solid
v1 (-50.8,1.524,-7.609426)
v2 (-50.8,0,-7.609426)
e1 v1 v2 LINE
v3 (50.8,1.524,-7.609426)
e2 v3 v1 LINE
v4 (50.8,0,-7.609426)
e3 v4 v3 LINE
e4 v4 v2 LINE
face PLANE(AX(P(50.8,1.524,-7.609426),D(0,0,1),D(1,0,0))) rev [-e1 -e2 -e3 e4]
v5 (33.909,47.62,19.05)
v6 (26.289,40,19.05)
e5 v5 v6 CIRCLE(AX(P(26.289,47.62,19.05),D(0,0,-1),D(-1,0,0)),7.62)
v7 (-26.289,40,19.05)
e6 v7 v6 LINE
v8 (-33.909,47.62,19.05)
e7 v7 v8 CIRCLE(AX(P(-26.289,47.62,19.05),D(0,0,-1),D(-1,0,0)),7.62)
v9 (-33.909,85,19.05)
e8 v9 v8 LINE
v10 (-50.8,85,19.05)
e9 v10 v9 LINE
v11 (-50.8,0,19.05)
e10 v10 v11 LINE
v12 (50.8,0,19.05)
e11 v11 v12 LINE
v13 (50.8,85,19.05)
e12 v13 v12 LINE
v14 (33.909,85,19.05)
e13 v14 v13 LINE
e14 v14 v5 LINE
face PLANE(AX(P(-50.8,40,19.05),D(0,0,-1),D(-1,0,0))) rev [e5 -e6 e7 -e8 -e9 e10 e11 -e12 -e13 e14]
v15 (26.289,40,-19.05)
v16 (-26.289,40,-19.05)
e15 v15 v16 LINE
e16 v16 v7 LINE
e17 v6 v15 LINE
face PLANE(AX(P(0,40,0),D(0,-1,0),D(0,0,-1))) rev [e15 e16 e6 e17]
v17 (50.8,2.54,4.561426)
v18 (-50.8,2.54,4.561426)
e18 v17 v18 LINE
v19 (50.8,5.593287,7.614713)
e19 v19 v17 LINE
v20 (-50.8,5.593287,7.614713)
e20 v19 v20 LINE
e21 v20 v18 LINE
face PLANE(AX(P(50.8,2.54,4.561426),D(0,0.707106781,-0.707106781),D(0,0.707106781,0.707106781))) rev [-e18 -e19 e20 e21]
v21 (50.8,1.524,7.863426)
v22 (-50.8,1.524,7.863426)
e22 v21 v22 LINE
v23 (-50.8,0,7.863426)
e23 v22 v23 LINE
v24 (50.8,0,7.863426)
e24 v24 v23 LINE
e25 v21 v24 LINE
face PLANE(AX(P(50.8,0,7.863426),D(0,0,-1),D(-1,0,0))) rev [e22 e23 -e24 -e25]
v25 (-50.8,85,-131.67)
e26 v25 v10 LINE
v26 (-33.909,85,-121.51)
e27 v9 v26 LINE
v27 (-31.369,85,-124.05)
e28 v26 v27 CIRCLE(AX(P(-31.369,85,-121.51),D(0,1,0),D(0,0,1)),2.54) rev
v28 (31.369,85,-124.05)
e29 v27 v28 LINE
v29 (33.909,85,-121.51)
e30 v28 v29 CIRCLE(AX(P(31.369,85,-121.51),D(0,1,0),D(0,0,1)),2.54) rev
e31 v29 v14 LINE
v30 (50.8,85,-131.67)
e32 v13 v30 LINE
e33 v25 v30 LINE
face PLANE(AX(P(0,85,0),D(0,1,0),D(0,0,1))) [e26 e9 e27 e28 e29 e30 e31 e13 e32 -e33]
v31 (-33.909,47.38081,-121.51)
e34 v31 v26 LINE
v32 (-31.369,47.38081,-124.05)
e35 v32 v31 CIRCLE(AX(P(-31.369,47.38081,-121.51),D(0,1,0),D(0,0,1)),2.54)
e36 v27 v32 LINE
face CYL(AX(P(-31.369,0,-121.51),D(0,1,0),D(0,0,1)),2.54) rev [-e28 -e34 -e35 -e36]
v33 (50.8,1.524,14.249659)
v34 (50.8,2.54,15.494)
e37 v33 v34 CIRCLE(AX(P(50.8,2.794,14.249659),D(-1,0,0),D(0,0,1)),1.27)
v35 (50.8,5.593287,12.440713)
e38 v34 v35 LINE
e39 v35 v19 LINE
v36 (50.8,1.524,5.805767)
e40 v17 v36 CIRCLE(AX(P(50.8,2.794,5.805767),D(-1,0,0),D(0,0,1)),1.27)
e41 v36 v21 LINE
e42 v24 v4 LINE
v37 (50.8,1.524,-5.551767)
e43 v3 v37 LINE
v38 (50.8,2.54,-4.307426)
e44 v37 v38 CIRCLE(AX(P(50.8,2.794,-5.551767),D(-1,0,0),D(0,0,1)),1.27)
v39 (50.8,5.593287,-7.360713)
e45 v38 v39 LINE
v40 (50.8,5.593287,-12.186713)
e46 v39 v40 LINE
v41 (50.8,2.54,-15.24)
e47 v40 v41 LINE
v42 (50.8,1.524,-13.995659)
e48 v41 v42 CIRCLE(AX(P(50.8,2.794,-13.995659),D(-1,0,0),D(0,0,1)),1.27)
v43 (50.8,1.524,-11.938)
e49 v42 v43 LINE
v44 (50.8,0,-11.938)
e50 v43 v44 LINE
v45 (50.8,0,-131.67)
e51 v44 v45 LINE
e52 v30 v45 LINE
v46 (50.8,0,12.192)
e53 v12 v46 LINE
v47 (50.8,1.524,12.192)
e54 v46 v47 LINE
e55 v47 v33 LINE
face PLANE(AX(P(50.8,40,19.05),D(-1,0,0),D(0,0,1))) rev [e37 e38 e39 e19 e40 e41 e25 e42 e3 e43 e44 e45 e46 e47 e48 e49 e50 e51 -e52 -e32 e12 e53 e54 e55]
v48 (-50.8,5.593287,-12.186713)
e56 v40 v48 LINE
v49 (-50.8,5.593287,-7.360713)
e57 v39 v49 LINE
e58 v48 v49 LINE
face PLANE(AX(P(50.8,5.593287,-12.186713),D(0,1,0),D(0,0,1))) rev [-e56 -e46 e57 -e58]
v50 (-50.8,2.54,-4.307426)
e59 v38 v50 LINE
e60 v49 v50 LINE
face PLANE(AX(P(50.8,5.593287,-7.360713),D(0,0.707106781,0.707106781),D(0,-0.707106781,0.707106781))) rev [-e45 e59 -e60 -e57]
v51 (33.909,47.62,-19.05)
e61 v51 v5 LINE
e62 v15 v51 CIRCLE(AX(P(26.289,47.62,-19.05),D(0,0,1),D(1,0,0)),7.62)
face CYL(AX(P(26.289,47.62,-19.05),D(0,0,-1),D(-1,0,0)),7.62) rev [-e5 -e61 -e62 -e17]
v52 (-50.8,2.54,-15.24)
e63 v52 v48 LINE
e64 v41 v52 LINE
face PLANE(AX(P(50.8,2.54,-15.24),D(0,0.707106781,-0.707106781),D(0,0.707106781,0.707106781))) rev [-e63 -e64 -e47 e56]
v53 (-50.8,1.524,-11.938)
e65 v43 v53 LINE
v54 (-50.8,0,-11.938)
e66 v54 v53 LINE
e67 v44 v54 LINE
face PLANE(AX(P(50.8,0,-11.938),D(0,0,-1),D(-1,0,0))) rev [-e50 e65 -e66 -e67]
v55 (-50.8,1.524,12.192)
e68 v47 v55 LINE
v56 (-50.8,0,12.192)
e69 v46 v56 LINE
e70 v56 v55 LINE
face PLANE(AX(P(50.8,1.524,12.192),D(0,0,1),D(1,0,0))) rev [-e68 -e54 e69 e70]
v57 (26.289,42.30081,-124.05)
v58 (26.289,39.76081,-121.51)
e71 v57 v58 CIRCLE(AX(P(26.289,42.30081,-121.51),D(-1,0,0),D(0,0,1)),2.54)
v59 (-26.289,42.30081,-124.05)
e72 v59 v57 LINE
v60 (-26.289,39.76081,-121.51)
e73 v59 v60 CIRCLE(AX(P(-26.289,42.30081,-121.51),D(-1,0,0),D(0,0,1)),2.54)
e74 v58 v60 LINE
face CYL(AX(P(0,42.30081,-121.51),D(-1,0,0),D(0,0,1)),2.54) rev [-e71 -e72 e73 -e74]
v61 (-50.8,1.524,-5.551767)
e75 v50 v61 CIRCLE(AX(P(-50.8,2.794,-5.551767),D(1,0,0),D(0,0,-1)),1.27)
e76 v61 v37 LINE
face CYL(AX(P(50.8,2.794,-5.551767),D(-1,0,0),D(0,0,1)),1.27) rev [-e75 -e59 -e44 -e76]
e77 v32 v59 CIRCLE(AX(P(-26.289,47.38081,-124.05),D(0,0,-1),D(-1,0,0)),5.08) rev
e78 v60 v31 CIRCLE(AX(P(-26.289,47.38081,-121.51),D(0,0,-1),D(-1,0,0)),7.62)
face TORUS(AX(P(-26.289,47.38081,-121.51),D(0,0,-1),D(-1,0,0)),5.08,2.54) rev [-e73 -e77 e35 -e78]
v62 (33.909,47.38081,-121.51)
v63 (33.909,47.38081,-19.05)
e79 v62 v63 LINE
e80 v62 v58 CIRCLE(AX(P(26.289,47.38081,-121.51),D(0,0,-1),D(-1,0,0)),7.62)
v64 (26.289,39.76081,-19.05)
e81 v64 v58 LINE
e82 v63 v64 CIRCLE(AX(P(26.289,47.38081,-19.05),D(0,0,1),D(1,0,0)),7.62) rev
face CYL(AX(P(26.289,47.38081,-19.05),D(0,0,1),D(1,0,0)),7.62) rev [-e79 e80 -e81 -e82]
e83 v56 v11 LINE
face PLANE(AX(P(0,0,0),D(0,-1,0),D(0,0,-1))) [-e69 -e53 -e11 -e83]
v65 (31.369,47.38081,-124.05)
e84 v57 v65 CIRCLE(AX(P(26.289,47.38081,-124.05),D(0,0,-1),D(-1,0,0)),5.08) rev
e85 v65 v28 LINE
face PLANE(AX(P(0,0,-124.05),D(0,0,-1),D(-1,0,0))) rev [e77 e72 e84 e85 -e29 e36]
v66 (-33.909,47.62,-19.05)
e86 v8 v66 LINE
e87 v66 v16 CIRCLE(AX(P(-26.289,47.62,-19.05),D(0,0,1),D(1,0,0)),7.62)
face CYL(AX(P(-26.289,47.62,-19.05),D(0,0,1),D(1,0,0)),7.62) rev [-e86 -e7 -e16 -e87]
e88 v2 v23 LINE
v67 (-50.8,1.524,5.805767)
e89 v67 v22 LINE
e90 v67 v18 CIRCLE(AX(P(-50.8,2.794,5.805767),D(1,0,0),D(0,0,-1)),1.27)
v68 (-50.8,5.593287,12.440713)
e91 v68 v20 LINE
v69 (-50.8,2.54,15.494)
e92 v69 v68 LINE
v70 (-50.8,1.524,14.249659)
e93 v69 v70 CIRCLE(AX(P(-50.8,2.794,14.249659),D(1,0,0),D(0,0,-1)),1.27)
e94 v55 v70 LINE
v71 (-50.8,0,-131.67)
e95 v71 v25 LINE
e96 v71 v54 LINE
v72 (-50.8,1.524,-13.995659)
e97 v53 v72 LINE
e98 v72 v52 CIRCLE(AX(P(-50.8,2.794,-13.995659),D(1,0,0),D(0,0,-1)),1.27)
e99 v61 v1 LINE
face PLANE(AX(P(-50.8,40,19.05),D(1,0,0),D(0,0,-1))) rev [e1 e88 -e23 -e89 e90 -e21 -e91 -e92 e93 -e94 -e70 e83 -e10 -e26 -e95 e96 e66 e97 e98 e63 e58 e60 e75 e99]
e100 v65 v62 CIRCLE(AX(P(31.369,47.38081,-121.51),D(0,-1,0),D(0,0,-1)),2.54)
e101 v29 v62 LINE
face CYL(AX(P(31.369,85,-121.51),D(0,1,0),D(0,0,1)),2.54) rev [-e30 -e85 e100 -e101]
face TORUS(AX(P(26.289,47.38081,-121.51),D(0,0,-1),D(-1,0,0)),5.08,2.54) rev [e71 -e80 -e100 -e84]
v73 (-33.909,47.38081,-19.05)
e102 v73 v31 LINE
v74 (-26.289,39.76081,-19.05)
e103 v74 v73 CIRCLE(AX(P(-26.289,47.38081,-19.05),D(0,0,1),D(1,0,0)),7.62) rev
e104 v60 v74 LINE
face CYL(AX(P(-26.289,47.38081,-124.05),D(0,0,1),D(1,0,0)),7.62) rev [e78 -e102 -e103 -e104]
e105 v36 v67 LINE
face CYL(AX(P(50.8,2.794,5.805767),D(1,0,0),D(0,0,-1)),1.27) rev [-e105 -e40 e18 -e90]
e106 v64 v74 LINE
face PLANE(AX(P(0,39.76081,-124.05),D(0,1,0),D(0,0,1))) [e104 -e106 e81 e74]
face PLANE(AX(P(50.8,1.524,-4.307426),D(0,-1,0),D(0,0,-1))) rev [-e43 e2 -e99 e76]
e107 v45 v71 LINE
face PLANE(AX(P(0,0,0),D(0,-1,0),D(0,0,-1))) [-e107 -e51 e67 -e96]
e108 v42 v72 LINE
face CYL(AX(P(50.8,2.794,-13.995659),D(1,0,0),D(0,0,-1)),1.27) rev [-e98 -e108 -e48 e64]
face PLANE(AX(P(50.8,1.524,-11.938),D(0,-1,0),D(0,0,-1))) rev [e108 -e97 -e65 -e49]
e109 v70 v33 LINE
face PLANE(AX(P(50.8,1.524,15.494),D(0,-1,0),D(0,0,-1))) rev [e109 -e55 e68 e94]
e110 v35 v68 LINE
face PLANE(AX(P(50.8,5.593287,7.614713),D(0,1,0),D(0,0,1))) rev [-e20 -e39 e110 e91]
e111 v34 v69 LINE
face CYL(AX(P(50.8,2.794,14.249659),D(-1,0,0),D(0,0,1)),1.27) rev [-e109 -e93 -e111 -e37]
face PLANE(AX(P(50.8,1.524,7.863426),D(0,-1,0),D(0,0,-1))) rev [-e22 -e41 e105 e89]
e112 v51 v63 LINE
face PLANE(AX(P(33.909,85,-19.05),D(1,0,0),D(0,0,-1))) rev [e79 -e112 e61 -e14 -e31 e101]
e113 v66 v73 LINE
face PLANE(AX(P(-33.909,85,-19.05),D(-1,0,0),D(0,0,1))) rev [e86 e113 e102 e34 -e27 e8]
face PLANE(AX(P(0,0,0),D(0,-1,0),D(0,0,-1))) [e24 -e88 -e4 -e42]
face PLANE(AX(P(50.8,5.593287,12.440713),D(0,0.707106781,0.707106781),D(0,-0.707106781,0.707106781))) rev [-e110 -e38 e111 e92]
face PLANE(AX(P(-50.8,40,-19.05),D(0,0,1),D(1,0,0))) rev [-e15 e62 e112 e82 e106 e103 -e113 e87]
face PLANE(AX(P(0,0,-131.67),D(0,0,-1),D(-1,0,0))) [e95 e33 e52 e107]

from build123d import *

# Parameters (mm, degrees)
SKETCH1_W               = 101.6
SKETCH1_H               = 38.1
BOSS_EXTRUDE1_DEPTH     = 40
SKETCH2_W               = 16.891
SKETCH2_H               = 38.1
BOSS_EXTRUDE2_DEPTH     = 45
FILLET1_R               = 7.62
CUT_EXTRUDE1_DEPTH      = 134.829976089
CUT_EXTRUDE1_DEPTH_BACK = 134.829976089
CUT_EXTRUDE2_DEPTH      = 134.829976089
CUT_EXTRUDE2_DEPTH_BACK = 134.829976089
FILLET2_R               = 1.27
BOSS_EXTRUDE3_DEPTH     = 105
FILLET3_R               = 7.62
SKETCH9_W               = 101.6
SKETCH9_H               = 85
BOSS_EXTRUDE4_DEPTH     = 7.62
FILLET4_R               = 2.54


with BuildPart() as part:
    # Sketch1 → Boss-Extrude1 (new body)
    with BuildSketch(Plane(origin=(0, 0, 0), x_dir=(1, 0, 0), z_dir=(0, 1, 0))):
        Rectangle(SKETCH1_W, SKETCH1_H)
    extrude(amount=BOSS_EXTRUDE1_DEPTH)

    # Sketch2 → Boss-Extrude2 (add)
    with BuildSketch(Plane(origin=(0, 40, 0), x_dir=(1, 0, 0), z_dir=(0, 1, 0))):
        with Locations((-42.3545, 0)):
            Rectangle(SKETCH2_W, SKETCH2_H)
        with Locations((42.3545, 0)):
            Rectangle(SKETCH2_W, SKETCH2_H)
    extrude(amount=BOSS_EXTRUDE2_DEPTH)

    # Fillet1
    fillet1_edges = [part.edges().sort_by_distance(p)[0] for p in [
        (-33.909, 40, 0),
        (33.909, 40, 0),
    ]]
    fillet(fillet1_edges, radius=FILLET1_R)

    # Sketch6 → Cut-Extrude1 (cut, two sides: drawn at the far end of the back side and taken through both)
    with BuildSketch(Plane.ZY.offset(50.8).offset(-CUT_EXTRUDE1_DEPTH_BACK)):
        Polygon((-11.938, 0), (-11.938, 1.524), (-15.24, 1.524), (-15.24, 2.54), (-12.186712919, 5.593287081), (-7.360712919, 5.593287081), (-4.307425838, 2.54), (-4.307425838, 1.524), (-7.609425838, 1.524), (-7.609425838, 0), align=None)
    extrude(amount=CUT_EXTRUDE1_DEPTH + CUT_EXTRUDE1_DEPTH_BACK, mode=Mode.SUBTRACT)

    # Sketch5 → Cut-Extrude2 (cut, two sides: drawn at the far end of the back side and taken through both)
    with BuildSketch(Plane.ZY.offset(50.8).offset(-CUT_EXTRUDE2_DEPTH_BACK)):
        Polygon((7.863425838, 0), (7.863425838, 1.524), (4.561425838, 1.524), (4.561425838, 2.54), (7.614712919, 5.593287081), (12.440712919, 5.593287081), (15.494, 2.54), (15.494, 1.524), (12.192, 1.524), (12.192, 0), align=None)
    extrude(amount=CUT_EXTRUDE2_DEPTH + CUT_EXTRUDE2_DEPTH_BACK, mode=Mode.SUBTRACT)

    # Fillet2
    # the kernel refuses this fillet: 1.27 mm, written as the material it adds along each edge
    with BuildSketch(Plane(origin=(-50.8, 1.524, -15.24), x_dir=(0, 0, 1), z_dir=(1, 0, 0)), Plane(origin=(-50.8, 1.524, 4.561425838), x_dir=(0, 0, 1), z_dir=(1, 0, 0))) as fillet2_piece_1:
        with BuildLine():
            CenterArc((1.244340789, -1.27), FILLET2_R, 90, 78.463040967)
            Line((0, -1.016), (-0.024886816, -1.01092))
            ThreePointArc((-0.024886816, -1.01092), (-0.0254, -0.508), (-0.0254, 0))
            Line((-0.0254, 0), (0, 0.0254))
            Line((0, 0.0254), (1.244340789, 0.0254))
            Line((1.244340789, 0.0254), (1.244340789, 0))
        make_face()
    extrude(amount=101.6)
    with BuildSketch(Plane(origin=(-50.8, 1.524, -4.307425838), x_dir=(0, 1.0, -1.5744186357080854e-12), z_dir=(1, 0, 0)), Plane(origin=(-50.8, 1.524, 15.494), x_dir=(0, 1.0, -1.561305765338501e-12), z_dir=(1, 0, 0))) as fillet2_piece_2:
        with BuildLine():
            CenterArc((1.27, -1.244340789), FILLET2_R, 101.536959033, 78.463040967)
            Line((0, -1.244340789), (-0.0254, -1.244340789))
            Line((-0.0254, -1.244340789), (-0.0254, 0))
            Line((-0.0254, 0), (0, 0.0254))
            ThreePointArc((0, 0.0254), (0.508, 0.0254), (1.01092, 0.024886816))
            Line((1.01092, 0.024886816), (1.016, 0))
        make_face()
    extrude(amount=101.6)

    # Sketch8 → Boss-Extrude3 (add)
    with BuildSketch(Plane(origin=(0, 0, -19.05), x_dir=(-1, 0, 0), z_dir=(0, 0, -1))):
        Polygon((-33.909, 39.760810351), (-50.8, 39.760810351), (-50.8, 0), (50.8, 0), (50.8, 39.760810351), (33.909, 39.760810351), align=None)
        Polygon((-50.8, 85), (-50.8, 39.760810351), (-33.909, 39.760810351), (-33.909, 47.62), (-33.909, 85), align=None)
        Polygon((33.909, 47.62), (33.909, 39.760810351), (50.8, 39.760810351), (50.8, 85), (33.909, 85), align=None)
    extrude(amount=BOSS_EXTRUDE3_DEPTH)

    # Fillet3
    fillet3_edges = [part.edges().sort_by_distance(p)[0] for p in [
        (-33.909, 39.760810351, -71.55),
        (33.909, 39.760810351, -71.55),
    ]]
    fillet(fillet3_edges, radius=FILLET3_R)

    # Sketch9 → Boss-Extrude4 (add)
    with BuildSketch(Plane(origin=(0, 0, -124.05), x_dir=(-1, 0, 0), z_dir=(0, 0, -1))):
        with Locations((0, 42.5)):
            Rectangle(SKETCH9_W, SKETCH9_H)
    extrude(amount=BOSS_EXTRUDE4_DEPTH)

    # Fillet4
    fillet4_edges = [part.edges().sort_by_distance(p)[0] for p in [
        (33.909, 66.190405175, -124.05),
        (-33.909, 66.190405175, -124.05),
        (0, 39.760810351, -124.05),
        (-31.677153673, 41.992656678, -124.05),
        (31.677153673, 41.992656678, -124.05),
    ]]
    fillet(fillet4_edges, radius=FILLET4_R)


solid = part.part
